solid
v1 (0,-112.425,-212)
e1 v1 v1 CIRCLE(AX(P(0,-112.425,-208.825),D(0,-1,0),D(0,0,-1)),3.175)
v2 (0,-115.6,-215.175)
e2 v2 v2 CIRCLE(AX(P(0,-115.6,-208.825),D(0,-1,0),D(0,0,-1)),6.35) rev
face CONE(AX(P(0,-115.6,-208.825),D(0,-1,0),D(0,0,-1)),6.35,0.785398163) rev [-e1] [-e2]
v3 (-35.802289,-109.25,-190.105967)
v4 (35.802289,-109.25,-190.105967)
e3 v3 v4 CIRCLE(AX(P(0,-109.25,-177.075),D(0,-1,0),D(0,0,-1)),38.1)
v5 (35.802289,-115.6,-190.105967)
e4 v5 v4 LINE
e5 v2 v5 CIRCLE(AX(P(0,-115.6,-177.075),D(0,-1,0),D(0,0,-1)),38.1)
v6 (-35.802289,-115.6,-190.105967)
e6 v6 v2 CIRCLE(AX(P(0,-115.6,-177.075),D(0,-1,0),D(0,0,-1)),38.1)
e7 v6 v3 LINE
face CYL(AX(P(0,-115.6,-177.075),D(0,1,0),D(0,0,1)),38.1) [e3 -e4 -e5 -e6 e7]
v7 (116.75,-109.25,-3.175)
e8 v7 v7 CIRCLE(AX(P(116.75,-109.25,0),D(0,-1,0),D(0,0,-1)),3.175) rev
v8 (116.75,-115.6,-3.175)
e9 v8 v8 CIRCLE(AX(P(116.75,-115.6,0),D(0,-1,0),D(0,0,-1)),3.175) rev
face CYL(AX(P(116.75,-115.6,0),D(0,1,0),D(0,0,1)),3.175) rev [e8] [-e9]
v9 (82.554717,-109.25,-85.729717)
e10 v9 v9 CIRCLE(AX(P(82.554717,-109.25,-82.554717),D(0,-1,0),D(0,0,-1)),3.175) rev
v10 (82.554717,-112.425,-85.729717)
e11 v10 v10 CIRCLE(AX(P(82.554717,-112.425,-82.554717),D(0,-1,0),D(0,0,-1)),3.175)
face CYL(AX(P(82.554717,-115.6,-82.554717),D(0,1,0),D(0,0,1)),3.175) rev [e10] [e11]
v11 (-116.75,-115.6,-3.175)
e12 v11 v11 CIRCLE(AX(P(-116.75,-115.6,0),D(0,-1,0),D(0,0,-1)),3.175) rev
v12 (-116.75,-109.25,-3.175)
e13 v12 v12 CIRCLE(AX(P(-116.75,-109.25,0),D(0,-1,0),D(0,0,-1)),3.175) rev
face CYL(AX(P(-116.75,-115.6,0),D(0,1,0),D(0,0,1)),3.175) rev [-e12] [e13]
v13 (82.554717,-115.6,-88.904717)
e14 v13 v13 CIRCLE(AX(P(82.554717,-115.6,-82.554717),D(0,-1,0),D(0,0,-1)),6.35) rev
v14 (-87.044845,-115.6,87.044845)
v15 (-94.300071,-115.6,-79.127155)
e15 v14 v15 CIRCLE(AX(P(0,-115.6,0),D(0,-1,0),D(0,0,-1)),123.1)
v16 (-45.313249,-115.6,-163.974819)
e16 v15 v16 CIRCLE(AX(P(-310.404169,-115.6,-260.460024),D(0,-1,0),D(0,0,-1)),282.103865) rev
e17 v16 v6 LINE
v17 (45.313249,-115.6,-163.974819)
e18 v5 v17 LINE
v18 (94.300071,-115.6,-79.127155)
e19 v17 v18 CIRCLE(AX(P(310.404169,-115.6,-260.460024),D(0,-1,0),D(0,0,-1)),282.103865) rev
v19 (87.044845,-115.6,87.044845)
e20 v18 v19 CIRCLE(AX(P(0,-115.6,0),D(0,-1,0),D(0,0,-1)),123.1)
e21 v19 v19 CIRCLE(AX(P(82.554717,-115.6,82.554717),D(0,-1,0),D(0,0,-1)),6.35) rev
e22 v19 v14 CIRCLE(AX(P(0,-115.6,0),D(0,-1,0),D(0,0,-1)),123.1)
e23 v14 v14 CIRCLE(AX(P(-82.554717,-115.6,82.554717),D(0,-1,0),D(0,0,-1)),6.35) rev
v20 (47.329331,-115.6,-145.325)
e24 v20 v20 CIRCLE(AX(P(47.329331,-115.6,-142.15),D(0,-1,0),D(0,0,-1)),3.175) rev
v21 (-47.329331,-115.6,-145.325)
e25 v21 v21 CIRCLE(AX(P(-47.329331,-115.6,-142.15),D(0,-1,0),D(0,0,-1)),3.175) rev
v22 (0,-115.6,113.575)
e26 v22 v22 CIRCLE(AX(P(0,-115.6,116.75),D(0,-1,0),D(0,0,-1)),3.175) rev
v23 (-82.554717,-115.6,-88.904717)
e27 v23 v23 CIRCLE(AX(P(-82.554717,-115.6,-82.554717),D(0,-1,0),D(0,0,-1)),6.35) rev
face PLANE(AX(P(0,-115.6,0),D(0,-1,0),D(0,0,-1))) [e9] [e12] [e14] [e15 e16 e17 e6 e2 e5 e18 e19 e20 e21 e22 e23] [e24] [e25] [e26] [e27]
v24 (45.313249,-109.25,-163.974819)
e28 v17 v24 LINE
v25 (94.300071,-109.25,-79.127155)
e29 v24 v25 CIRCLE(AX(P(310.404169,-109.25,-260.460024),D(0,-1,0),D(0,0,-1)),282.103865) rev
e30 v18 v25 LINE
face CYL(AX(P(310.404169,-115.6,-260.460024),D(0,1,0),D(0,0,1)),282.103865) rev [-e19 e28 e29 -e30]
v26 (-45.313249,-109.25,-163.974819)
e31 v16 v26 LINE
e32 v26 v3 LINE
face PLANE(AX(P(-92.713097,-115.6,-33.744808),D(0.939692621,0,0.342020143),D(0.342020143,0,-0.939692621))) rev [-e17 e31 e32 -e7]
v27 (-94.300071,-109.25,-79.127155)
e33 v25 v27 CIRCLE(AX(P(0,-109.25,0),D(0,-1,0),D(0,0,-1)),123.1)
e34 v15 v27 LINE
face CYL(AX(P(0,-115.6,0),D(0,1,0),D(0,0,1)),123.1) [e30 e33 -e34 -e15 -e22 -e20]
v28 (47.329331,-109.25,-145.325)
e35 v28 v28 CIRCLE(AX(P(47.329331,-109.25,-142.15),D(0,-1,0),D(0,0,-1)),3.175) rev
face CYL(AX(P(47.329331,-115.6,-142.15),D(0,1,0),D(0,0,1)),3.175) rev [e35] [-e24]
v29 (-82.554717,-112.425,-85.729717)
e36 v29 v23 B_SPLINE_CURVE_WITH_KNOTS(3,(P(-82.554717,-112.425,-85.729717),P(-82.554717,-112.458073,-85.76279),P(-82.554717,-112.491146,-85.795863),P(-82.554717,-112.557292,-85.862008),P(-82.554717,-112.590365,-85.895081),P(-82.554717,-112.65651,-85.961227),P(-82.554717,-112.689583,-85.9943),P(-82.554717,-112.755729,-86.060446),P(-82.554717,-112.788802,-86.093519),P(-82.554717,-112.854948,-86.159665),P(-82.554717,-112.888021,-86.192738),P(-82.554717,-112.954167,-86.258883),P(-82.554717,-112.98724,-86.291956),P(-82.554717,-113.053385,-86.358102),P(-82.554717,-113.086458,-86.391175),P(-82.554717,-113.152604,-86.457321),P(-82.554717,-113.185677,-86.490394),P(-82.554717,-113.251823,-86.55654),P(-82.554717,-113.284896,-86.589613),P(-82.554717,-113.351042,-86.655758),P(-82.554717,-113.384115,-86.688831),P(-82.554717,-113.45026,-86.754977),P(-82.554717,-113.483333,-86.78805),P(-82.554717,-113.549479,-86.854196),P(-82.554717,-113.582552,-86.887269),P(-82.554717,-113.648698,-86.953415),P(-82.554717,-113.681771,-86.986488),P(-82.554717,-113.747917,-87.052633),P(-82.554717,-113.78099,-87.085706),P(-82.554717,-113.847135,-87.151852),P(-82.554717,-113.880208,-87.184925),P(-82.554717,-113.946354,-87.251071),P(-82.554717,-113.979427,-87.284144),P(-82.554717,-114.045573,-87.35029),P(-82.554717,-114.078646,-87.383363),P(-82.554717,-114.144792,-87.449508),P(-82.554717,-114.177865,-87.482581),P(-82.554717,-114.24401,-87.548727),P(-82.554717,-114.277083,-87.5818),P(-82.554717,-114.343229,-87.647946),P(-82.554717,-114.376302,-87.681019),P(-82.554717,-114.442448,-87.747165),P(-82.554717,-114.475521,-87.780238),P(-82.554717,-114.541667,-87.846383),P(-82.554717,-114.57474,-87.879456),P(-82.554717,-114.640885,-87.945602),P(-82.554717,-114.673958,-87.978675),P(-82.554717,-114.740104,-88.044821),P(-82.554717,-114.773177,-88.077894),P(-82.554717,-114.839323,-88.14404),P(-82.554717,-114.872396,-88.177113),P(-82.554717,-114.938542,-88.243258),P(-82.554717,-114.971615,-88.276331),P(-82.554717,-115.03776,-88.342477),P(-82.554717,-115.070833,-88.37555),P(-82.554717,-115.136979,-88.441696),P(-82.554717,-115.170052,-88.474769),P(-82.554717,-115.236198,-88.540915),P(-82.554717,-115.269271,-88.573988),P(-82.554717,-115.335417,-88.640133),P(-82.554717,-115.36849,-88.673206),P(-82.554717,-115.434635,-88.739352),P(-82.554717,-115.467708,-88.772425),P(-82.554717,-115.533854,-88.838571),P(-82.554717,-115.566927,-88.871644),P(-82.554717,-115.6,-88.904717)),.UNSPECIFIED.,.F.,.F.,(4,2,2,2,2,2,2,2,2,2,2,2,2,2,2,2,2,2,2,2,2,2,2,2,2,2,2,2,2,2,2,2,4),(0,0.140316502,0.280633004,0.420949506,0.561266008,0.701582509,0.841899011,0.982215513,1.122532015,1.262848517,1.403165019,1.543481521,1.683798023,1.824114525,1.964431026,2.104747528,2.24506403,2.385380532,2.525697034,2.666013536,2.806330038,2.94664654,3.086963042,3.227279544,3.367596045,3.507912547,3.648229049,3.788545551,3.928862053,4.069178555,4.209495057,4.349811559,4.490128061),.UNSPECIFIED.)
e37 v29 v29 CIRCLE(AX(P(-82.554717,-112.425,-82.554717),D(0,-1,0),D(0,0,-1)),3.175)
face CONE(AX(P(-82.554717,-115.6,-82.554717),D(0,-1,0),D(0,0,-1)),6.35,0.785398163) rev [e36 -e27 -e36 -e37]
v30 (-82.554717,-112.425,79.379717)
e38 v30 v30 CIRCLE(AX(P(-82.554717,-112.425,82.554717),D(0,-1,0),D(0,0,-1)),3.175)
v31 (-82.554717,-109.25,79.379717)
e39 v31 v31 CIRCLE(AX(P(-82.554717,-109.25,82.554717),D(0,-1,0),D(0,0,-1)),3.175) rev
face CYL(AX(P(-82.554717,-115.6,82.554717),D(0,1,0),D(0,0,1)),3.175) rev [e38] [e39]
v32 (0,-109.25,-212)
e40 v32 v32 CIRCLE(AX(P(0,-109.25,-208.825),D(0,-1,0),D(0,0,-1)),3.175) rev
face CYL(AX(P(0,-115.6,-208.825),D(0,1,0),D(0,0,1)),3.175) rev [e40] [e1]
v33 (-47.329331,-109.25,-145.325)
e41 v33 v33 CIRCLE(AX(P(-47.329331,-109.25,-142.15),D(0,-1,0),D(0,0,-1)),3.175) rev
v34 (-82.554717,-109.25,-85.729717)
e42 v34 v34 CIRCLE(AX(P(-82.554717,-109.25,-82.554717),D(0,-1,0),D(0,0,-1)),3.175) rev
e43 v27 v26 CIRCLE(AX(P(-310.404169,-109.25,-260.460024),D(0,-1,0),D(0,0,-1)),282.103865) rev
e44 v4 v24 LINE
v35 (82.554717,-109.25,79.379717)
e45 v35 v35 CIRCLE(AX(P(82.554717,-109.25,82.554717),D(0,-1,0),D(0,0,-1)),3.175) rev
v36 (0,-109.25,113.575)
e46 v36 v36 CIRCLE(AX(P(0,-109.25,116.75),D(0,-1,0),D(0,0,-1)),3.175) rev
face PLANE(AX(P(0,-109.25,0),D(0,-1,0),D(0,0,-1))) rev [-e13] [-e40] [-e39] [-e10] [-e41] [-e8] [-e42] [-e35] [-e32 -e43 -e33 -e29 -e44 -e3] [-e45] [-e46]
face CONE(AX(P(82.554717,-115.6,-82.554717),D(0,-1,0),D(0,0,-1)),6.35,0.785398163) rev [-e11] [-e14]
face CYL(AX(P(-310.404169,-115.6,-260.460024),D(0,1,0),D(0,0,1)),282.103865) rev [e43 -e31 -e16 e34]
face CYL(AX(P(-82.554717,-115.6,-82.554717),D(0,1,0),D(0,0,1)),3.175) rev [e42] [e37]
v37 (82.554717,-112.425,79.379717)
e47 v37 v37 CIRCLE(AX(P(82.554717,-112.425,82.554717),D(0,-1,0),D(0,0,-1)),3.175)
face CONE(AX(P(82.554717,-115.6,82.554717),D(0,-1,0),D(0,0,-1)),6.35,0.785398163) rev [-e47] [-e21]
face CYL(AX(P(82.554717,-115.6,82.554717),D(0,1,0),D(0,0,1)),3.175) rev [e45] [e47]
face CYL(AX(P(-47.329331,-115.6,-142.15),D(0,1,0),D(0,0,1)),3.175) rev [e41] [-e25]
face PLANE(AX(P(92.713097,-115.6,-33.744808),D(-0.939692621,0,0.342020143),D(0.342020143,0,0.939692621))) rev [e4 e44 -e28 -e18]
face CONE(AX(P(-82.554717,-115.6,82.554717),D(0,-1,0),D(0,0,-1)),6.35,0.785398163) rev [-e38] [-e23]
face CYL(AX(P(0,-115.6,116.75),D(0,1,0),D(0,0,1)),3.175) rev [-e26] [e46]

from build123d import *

# Parameters (mm, degrees)
SKETCH1_R           = 3.175
BOSS_EXTRUDE1_DEPTH = 6.35
CHAMFER1_SIZE       = 3.175


with BuildPart() as part:
    # Sketch1 → Boss-Extrude1 (new body)
    with BuildSketch(Plane.XZ.offset(109.25)):
        with BuildLine():
            ThreePointArc((-94.300070948, -79.127154752), (-66.095055559, -119.40809126), (-45.31324895, -163.974819355))
            Line((-45.31324895, -163.974819355), (-35.802288852, -190.105967461))
            ThreePointArc((-35.802288852, -190.105967461), (0, -215.175), (35.802288852, -190.105967461))
            Line((35.802288852, -190.105967461), (45.31324895, -163.974819355))
            ThreePointArc((45.31324895, -163.974819355), (66.095055559, -119.40809126), (94.300070948, -79.127154752))
            ThreePointArc((94.300070948, -79.127154752), (0, 123.1), (-94.300070948, -79.127154752))
        make_face()
        with Locations(Location((-47.329330924, -142.15, 0), (0, 0, 270))):
            Circle(SKETCH1_R, mode=Mode.SUBTRACT)
        with Locations(Location((-82.554716704, -82.554716704, 0), (0, 0, 270))):
            Circle(SKETCH1_R, mode=Mode.SUBTRACT)
        with Locations(Location((0, -208.825, 0), (0, 0, 270))):
            Circle(SKETCH1_R, mode=Mode.SUBTRACT)
        with Locations(Location((47.329330924, -142.15, 0), (0, 0, 270))):
            Circle(SKETCH1_R, mode=Mode.SUBTRACT)
        with Locations(Location((82.554716704, -82.554716704, 0), (0, 0, 270))):
            Circle(SKETCH1_R, mode=Mode.SUBTRACT)
        with Locations(Location((-116.75, 0, 0), (0, 0, 270))):
            Circle(SKETCH1_R, mode=Mode.SUBTRACT)
        with Locations(Location((-82.554716704, 82.554716704, 0), (0, 0, 270))):
            Circle(SKETCH1_R, mode=Mode.SUBTRACT)
        with Locations(Location((116.75, 0, 0), (0, 0, 270))):
            Circle(SKETCH1_R, mode=Mode.SUBTRACT)
        with Locations(Location((0, 116.75, 0), (0, 0, 270))):
            Circle(SKETCH1_R, mode=Mode.SUBTRACT)
        with Locations(Location((82.554716704, 82.554716704, 0), (0, 0, 270))):
            Circle(SKETCH1_R, mode=Mode.SUBTRACT)
    extrude(amount=BOSS_EXTRUDE1_DEPTH)

    # Chamfer1
    chamfer1_edges = [part.edges().sort_by_distance(p)[0] for p in [
        (0, -115.6, -205.65),
        (82.554716704, -115.6, 85.729716704),
        (-82.554716704, -115.6, -79.379716704),
        (-82.554716704, -115.6, 85.729716704),
        (82.554716704, -115.6, -79.379716704),
    ]]
    chamfer(chamfer1_edges, length=CHAMFER1_SIZE - 0.0001)  # a hair under: the kernel refuses the full size


solid = part.part
